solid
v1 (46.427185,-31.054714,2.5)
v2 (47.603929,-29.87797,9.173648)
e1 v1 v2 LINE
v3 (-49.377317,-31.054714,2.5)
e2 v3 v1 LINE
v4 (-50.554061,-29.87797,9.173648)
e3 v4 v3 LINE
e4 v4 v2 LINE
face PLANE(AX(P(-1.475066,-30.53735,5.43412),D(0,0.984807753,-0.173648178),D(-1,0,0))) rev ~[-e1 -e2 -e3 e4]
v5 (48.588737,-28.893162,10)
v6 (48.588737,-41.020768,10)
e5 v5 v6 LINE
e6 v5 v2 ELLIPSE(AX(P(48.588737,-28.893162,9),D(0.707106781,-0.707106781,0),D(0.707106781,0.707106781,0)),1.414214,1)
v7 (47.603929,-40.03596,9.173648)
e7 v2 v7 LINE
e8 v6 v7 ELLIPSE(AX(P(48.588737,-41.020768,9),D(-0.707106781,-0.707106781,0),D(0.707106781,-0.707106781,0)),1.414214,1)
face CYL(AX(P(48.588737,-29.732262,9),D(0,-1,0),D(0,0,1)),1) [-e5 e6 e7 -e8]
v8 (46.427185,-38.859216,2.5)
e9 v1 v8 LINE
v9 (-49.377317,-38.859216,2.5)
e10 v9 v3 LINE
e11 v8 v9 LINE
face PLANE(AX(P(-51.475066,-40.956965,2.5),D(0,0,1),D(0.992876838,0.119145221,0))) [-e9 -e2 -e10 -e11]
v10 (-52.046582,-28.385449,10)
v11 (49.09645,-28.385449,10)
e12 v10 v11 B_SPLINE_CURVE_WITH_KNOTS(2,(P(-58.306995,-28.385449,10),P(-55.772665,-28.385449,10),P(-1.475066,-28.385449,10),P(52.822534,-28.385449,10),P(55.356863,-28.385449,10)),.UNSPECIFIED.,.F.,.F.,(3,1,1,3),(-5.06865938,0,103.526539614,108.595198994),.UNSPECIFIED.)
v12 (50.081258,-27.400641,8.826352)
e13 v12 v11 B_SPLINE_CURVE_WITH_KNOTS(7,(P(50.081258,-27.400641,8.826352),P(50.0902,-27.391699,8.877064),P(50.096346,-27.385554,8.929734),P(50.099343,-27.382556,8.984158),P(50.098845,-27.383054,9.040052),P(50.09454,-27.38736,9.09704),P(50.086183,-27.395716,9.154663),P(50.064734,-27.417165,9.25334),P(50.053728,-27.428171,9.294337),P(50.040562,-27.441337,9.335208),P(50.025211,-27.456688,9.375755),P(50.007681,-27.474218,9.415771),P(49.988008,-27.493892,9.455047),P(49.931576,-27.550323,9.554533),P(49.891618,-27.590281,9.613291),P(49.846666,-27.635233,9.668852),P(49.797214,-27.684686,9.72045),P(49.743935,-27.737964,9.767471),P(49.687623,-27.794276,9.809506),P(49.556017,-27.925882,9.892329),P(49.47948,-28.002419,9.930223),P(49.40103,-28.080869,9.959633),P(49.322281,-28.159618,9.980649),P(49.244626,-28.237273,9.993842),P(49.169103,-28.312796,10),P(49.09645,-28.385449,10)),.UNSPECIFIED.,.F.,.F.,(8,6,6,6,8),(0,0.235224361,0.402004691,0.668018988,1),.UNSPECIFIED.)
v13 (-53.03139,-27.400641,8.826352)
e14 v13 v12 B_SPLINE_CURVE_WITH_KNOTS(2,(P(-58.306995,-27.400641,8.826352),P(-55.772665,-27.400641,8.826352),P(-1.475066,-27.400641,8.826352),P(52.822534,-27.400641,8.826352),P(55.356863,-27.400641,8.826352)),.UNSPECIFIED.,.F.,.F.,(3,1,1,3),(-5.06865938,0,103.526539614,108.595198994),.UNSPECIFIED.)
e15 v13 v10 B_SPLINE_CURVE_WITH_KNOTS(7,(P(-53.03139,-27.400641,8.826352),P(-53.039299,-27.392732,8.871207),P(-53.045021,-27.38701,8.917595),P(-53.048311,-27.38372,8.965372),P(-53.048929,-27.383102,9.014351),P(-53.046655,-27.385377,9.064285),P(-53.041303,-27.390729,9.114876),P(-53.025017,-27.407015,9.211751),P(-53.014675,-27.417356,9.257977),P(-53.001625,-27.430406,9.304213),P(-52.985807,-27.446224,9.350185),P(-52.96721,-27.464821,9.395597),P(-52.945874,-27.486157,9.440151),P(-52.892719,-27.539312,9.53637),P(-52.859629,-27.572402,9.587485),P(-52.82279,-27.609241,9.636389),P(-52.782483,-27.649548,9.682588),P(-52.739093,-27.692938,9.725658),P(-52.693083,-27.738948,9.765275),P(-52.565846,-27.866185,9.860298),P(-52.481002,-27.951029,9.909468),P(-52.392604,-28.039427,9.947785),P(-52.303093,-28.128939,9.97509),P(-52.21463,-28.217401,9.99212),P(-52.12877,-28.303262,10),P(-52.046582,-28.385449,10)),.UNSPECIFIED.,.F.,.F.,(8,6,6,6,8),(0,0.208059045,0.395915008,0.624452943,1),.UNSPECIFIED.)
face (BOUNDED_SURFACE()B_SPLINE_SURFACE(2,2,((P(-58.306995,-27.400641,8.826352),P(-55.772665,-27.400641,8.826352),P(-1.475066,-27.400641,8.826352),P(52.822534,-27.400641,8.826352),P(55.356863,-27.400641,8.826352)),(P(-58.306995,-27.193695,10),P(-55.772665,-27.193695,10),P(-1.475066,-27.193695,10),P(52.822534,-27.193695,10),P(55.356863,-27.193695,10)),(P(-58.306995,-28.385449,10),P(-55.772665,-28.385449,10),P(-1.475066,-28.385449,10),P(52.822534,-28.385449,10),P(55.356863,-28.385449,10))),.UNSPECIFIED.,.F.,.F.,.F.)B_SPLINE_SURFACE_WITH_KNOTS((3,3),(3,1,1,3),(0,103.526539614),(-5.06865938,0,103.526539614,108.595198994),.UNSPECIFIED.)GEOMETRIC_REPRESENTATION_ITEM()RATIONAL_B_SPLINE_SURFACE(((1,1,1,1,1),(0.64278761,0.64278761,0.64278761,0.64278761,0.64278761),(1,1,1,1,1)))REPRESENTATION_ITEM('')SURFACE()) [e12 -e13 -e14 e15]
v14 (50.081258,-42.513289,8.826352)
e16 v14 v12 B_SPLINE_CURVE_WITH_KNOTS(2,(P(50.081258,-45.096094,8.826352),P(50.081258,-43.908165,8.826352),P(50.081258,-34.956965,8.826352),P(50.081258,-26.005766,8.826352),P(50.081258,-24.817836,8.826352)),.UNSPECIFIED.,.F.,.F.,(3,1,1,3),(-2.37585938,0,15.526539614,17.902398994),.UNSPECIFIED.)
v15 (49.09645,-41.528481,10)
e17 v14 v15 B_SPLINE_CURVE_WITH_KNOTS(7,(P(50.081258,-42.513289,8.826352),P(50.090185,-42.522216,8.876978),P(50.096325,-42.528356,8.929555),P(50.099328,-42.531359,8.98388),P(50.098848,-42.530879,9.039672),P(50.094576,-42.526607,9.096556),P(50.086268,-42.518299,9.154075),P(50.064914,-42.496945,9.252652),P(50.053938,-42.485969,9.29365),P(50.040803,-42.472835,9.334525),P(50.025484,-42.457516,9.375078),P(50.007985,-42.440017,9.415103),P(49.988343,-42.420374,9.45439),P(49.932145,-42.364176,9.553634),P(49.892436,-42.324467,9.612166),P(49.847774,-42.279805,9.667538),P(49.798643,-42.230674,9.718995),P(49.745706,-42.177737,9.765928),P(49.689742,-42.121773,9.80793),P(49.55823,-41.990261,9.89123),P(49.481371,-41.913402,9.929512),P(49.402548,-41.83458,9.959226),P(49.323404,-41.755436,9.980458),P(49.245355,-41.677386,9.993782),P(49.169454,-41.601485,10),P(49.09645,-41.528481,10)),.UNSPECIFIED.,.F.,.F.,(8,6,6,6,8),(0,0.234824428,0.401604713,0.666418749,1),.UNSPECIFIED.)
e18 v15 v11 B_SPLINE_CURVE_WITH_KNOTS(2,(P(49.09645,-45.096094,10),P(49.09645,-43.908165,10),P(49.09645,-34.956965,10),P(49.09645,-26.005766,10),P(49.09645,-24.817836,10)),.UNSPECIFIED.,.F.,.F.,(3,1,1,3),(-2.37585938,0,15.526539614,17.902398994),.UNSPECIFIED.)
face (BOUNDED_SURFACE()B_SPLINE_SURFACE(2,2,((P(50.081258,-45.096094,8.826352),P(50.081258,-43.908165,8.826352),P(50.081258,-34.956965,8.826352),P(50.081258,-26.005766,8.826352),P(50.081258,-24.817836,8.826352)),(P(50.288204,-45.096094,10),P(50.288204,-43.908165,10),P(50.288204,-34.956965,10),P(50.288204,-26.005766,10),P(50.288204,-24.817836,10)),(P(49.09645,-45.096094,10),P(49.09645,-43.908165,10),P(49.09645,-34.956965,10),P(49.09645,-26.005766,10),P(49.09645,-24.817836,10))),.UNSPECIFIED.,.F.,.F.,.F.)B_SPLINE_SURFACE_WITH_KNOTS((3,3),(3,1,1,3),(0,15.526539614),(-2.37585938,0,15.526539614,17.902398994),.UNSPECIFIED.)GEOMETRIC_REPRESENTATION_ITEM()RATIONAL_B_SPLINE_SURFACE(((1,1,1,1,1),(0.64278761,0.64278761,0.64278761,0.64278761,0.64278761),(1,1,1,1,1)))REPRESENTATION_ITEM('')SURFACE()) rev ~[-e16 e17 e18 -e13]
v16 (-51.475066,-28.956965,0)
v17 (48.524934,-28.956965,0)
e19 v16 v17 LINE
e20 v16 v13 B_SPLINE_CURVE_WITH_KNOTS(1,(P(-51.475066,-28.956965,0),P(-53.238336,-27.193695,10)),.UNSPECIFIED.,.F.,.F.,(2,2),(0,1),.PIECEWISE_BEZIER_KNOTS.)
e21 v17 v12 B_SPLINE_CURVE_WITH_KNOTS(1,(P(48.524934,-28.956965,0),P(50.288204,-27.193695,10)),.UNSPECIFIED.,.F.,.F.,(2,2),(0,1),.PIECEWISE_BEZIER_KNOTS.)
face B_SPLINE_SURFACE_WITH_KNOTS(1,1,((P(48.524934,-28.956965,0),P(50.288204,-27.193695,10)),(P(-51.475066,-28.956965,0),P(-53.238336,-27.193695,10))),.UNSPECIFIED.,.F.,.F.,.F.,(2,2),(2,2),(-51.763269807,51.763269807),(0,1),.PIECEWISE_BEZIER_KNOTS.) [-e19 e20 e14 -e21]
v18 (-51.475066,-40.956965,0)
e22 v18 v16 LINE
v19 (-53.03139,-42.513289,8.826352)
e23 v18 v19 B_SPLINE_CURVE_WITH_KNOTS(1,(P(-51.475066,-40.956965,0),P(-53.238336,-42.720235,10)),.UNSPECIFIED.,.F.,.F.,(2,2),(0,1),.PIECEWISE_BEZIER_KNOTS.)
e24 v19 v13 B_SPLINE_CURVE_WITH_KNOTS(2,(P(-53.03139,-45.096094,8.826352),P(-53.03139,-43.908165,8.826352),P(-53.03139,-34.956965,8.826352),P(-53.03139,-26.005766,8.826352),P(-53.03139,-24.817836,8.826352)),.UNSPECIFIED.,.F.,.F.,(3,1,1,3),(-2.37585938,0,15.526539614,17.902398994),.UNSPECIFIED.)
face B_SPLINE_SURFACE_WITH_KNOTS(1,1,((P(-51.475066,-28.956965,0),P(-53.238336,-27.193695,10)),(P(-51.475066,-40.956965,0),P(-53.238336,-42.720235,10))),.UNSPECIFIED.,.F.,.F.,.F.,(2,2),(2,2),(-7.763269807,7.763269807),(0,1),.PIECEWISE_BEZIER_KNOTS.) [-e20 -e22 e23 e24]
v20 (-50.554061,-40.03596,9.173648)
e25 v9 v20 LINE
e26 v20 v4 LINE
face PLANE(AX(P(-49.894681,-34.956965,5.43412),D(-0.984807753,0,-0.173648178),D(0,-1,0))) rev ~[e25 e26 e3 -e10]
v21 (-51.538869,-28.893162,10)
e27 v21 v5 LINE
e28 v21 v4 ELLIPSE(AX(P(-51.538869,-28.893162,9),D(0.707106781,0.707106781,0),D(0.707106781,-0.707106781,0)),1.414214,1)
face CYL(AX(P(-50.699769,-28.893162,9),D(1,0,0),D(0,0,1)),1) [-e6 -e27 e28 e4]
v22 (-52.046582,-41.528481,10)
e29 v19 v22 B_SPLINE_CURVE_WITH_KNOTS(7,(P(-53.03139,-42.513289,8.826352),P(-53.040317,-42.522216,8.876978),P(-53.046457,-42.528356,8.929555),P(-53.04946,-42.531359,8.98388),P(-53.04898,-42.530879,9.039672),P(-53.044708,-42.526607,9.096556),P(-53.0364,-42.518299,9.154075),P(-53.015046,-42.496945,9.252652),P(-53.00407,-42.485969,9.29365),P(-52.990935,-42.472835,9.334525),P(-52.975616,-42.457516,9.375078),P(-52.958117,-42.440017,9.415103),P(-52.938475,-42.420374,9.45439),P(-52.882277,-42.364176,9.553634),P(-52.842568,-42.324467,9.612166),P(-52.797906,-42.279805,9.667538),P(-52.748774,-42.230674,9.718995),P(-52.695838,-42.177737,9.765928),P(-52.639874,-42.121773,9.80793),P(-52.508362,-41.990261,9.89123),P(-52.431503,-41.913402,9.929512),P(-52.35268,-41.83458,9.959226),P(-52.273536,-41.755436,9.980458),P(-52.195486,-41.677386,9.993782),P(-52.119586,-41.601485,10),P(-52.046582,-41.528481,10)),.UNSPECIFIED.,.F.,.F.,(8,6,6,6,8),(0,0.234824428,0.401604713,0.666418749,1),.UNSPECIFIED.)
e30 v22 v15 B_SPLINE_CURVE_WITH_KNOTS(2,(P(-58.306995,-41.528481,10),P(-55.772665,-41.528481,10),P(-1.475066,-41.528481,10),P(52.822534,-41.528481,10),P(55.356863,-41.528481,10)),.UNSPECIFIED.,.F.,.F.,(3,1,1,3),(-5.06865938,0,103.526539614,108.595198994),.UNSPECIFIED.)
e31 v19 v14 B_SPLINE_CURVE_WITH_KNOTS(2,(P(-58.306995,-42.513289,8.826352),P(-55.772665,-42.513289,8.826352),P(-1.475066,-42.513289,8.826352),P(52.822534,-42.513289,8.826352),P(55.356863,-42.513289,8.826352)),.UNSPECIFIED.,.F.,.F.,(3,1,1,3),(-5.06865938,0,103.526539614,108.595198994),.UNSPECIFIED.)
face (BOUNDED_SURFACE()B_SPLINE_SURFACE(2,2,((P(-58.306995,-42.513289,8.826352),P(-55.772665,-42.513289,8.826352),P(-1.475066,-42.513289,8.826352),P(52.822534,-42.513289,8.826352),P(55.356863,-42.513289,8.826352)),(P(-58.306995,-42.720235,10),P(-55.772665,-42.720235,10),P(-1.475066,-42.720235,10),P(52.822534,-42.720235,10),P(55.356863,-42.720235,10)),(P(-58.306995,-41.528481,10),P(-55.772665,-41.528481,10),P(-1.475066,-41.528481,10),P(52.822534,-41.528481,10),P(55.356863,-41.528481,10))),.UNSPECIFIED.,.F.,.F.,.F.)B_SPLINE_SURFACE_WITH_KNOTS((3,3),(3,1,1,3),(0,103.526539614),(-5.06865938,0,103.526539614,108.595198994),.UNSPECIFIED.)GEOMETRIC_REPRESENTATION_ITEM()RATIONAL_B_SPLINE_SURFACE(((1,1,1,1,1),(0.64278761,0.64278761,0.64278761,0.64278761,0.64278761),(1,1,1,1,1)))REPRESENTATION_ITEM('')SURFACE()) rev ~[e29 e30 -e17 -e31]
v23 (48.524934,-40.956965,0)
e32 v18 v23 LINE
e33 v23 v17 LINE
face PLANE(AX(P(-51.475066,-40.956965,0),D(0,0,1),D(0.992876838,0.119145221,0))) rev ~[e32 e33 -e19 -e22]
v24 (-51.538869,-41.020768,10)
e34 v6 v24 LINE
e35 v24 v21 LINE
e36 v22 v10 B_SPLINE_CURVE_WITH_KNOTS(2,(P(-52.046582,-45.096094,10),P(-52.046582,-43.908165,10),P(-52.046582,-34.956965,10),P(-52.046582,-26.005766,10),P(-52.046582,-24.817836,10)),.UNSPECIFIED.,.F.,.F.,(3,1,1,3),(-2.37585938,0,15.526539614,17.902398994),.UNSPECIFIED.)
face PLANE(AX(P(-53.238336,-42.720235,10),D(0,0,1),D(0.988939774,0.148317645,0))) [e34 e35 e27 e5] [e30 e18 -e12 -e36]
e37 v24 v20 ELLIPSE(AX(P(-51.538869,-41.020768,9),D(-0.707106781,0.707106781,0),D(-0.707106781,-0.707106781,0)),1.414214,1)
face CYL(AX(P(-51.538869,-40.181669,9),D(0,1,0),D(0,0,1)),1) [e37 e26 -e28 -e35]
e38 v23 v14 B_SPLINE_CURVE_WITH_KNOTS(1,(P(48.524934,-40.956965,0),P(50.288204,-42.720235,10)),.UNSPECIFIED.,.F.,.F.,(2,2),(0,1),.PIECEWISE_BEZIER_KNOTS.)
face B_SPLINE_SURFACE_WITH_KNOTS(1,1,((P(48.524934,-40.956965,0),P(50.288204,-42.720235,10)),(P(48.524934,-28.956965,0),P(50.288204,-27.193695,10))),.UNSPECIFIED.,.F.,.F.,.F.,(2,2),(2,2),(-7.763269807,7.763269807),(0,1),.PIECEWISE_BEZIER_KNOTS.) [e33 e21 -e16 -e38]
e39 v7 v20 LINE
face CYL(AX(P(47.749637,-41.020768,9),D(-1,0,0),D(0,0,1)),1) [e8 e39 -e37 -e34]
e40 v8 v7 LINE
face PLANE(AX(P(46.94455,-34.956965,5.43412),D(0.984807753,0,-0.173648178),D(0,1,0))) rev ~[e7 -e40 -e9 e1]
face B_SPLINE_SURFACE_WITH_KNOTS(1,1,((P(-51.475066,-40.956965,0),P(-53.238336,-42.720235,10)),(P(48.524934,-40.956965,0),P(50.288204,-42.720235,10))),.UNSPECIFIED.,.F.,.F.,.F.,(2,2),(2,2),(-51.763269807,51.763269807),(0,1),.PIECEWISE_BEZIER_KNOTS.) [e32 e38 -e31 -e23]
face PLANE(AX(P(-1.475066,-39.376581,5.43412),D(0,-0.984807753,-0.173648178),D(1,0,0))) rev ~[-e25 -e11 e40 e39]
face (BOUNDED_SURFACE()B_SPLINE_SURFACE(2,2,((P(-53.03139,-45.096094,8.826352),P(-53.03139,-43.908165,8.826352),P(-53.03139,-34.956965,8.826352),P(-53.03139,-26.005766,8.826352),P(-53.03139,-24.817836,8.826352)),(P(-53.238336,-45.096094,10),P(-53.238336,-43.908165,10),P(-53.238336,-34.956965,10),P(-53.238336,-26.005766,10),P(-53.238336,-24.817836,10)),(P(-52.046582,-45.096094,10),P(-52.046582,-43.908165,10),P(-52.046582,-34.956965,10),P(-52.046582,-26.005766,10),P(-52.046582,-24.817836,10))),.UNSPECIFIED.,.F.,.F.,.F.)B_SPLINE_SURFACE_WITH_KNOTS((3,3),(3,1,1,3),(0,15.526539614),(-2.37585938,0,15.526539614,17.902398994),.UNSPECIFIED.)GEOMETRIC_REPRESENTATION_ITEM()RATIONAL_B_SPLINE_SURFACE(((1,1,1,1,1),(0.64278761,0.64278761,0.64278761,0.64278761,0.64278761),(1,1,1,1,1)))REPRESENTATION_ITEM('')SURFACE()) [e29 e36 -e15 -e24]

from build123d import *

# Parameters (mm, degrees)
F0_W     = 100
F0_H     = 12
F1_DEPTH = 10
F1_TAPER = -10
F2_T     = -2.5
F3_R     = 1


with BuildPart() as f1:
    # F0 (on Top) → F1 (new body)
    with BuildSketch(Plane.XY):
        with Locations((-1.4750659466, -34.9569652333)):
            Rectangle(F0_W, F0_H)
    extrude(amount=F1_DEPTH, taper=F1_TAPER)

    # F2
    f2_openings = [f1.faces().sort_by_distance(p)[0] for p in [
        (-1.475066, -34.956965, 10),
    ]]
    offset(amount=F2_T, openings=f2_openings)

    # F3
    f3_edges = [f1.edges().sort_by_distance(p)[0] for p in [
        (-1.475066, -42.720235, 10),
        (-53.238336, -34.956965, 10),
        (-1.475066, -27.193695, 10),
        (50.288204, -34.956965, 10),
        (-1.475066, -29.732262, 10),
        (47.749637, -34.956965, 10),
        (-1.475066, -40.181669, 10),
        (-50.699769, -34.956965, 10),
    ]]
    fillet(f3_edges, radius=F3_R)


solid = f1.part
